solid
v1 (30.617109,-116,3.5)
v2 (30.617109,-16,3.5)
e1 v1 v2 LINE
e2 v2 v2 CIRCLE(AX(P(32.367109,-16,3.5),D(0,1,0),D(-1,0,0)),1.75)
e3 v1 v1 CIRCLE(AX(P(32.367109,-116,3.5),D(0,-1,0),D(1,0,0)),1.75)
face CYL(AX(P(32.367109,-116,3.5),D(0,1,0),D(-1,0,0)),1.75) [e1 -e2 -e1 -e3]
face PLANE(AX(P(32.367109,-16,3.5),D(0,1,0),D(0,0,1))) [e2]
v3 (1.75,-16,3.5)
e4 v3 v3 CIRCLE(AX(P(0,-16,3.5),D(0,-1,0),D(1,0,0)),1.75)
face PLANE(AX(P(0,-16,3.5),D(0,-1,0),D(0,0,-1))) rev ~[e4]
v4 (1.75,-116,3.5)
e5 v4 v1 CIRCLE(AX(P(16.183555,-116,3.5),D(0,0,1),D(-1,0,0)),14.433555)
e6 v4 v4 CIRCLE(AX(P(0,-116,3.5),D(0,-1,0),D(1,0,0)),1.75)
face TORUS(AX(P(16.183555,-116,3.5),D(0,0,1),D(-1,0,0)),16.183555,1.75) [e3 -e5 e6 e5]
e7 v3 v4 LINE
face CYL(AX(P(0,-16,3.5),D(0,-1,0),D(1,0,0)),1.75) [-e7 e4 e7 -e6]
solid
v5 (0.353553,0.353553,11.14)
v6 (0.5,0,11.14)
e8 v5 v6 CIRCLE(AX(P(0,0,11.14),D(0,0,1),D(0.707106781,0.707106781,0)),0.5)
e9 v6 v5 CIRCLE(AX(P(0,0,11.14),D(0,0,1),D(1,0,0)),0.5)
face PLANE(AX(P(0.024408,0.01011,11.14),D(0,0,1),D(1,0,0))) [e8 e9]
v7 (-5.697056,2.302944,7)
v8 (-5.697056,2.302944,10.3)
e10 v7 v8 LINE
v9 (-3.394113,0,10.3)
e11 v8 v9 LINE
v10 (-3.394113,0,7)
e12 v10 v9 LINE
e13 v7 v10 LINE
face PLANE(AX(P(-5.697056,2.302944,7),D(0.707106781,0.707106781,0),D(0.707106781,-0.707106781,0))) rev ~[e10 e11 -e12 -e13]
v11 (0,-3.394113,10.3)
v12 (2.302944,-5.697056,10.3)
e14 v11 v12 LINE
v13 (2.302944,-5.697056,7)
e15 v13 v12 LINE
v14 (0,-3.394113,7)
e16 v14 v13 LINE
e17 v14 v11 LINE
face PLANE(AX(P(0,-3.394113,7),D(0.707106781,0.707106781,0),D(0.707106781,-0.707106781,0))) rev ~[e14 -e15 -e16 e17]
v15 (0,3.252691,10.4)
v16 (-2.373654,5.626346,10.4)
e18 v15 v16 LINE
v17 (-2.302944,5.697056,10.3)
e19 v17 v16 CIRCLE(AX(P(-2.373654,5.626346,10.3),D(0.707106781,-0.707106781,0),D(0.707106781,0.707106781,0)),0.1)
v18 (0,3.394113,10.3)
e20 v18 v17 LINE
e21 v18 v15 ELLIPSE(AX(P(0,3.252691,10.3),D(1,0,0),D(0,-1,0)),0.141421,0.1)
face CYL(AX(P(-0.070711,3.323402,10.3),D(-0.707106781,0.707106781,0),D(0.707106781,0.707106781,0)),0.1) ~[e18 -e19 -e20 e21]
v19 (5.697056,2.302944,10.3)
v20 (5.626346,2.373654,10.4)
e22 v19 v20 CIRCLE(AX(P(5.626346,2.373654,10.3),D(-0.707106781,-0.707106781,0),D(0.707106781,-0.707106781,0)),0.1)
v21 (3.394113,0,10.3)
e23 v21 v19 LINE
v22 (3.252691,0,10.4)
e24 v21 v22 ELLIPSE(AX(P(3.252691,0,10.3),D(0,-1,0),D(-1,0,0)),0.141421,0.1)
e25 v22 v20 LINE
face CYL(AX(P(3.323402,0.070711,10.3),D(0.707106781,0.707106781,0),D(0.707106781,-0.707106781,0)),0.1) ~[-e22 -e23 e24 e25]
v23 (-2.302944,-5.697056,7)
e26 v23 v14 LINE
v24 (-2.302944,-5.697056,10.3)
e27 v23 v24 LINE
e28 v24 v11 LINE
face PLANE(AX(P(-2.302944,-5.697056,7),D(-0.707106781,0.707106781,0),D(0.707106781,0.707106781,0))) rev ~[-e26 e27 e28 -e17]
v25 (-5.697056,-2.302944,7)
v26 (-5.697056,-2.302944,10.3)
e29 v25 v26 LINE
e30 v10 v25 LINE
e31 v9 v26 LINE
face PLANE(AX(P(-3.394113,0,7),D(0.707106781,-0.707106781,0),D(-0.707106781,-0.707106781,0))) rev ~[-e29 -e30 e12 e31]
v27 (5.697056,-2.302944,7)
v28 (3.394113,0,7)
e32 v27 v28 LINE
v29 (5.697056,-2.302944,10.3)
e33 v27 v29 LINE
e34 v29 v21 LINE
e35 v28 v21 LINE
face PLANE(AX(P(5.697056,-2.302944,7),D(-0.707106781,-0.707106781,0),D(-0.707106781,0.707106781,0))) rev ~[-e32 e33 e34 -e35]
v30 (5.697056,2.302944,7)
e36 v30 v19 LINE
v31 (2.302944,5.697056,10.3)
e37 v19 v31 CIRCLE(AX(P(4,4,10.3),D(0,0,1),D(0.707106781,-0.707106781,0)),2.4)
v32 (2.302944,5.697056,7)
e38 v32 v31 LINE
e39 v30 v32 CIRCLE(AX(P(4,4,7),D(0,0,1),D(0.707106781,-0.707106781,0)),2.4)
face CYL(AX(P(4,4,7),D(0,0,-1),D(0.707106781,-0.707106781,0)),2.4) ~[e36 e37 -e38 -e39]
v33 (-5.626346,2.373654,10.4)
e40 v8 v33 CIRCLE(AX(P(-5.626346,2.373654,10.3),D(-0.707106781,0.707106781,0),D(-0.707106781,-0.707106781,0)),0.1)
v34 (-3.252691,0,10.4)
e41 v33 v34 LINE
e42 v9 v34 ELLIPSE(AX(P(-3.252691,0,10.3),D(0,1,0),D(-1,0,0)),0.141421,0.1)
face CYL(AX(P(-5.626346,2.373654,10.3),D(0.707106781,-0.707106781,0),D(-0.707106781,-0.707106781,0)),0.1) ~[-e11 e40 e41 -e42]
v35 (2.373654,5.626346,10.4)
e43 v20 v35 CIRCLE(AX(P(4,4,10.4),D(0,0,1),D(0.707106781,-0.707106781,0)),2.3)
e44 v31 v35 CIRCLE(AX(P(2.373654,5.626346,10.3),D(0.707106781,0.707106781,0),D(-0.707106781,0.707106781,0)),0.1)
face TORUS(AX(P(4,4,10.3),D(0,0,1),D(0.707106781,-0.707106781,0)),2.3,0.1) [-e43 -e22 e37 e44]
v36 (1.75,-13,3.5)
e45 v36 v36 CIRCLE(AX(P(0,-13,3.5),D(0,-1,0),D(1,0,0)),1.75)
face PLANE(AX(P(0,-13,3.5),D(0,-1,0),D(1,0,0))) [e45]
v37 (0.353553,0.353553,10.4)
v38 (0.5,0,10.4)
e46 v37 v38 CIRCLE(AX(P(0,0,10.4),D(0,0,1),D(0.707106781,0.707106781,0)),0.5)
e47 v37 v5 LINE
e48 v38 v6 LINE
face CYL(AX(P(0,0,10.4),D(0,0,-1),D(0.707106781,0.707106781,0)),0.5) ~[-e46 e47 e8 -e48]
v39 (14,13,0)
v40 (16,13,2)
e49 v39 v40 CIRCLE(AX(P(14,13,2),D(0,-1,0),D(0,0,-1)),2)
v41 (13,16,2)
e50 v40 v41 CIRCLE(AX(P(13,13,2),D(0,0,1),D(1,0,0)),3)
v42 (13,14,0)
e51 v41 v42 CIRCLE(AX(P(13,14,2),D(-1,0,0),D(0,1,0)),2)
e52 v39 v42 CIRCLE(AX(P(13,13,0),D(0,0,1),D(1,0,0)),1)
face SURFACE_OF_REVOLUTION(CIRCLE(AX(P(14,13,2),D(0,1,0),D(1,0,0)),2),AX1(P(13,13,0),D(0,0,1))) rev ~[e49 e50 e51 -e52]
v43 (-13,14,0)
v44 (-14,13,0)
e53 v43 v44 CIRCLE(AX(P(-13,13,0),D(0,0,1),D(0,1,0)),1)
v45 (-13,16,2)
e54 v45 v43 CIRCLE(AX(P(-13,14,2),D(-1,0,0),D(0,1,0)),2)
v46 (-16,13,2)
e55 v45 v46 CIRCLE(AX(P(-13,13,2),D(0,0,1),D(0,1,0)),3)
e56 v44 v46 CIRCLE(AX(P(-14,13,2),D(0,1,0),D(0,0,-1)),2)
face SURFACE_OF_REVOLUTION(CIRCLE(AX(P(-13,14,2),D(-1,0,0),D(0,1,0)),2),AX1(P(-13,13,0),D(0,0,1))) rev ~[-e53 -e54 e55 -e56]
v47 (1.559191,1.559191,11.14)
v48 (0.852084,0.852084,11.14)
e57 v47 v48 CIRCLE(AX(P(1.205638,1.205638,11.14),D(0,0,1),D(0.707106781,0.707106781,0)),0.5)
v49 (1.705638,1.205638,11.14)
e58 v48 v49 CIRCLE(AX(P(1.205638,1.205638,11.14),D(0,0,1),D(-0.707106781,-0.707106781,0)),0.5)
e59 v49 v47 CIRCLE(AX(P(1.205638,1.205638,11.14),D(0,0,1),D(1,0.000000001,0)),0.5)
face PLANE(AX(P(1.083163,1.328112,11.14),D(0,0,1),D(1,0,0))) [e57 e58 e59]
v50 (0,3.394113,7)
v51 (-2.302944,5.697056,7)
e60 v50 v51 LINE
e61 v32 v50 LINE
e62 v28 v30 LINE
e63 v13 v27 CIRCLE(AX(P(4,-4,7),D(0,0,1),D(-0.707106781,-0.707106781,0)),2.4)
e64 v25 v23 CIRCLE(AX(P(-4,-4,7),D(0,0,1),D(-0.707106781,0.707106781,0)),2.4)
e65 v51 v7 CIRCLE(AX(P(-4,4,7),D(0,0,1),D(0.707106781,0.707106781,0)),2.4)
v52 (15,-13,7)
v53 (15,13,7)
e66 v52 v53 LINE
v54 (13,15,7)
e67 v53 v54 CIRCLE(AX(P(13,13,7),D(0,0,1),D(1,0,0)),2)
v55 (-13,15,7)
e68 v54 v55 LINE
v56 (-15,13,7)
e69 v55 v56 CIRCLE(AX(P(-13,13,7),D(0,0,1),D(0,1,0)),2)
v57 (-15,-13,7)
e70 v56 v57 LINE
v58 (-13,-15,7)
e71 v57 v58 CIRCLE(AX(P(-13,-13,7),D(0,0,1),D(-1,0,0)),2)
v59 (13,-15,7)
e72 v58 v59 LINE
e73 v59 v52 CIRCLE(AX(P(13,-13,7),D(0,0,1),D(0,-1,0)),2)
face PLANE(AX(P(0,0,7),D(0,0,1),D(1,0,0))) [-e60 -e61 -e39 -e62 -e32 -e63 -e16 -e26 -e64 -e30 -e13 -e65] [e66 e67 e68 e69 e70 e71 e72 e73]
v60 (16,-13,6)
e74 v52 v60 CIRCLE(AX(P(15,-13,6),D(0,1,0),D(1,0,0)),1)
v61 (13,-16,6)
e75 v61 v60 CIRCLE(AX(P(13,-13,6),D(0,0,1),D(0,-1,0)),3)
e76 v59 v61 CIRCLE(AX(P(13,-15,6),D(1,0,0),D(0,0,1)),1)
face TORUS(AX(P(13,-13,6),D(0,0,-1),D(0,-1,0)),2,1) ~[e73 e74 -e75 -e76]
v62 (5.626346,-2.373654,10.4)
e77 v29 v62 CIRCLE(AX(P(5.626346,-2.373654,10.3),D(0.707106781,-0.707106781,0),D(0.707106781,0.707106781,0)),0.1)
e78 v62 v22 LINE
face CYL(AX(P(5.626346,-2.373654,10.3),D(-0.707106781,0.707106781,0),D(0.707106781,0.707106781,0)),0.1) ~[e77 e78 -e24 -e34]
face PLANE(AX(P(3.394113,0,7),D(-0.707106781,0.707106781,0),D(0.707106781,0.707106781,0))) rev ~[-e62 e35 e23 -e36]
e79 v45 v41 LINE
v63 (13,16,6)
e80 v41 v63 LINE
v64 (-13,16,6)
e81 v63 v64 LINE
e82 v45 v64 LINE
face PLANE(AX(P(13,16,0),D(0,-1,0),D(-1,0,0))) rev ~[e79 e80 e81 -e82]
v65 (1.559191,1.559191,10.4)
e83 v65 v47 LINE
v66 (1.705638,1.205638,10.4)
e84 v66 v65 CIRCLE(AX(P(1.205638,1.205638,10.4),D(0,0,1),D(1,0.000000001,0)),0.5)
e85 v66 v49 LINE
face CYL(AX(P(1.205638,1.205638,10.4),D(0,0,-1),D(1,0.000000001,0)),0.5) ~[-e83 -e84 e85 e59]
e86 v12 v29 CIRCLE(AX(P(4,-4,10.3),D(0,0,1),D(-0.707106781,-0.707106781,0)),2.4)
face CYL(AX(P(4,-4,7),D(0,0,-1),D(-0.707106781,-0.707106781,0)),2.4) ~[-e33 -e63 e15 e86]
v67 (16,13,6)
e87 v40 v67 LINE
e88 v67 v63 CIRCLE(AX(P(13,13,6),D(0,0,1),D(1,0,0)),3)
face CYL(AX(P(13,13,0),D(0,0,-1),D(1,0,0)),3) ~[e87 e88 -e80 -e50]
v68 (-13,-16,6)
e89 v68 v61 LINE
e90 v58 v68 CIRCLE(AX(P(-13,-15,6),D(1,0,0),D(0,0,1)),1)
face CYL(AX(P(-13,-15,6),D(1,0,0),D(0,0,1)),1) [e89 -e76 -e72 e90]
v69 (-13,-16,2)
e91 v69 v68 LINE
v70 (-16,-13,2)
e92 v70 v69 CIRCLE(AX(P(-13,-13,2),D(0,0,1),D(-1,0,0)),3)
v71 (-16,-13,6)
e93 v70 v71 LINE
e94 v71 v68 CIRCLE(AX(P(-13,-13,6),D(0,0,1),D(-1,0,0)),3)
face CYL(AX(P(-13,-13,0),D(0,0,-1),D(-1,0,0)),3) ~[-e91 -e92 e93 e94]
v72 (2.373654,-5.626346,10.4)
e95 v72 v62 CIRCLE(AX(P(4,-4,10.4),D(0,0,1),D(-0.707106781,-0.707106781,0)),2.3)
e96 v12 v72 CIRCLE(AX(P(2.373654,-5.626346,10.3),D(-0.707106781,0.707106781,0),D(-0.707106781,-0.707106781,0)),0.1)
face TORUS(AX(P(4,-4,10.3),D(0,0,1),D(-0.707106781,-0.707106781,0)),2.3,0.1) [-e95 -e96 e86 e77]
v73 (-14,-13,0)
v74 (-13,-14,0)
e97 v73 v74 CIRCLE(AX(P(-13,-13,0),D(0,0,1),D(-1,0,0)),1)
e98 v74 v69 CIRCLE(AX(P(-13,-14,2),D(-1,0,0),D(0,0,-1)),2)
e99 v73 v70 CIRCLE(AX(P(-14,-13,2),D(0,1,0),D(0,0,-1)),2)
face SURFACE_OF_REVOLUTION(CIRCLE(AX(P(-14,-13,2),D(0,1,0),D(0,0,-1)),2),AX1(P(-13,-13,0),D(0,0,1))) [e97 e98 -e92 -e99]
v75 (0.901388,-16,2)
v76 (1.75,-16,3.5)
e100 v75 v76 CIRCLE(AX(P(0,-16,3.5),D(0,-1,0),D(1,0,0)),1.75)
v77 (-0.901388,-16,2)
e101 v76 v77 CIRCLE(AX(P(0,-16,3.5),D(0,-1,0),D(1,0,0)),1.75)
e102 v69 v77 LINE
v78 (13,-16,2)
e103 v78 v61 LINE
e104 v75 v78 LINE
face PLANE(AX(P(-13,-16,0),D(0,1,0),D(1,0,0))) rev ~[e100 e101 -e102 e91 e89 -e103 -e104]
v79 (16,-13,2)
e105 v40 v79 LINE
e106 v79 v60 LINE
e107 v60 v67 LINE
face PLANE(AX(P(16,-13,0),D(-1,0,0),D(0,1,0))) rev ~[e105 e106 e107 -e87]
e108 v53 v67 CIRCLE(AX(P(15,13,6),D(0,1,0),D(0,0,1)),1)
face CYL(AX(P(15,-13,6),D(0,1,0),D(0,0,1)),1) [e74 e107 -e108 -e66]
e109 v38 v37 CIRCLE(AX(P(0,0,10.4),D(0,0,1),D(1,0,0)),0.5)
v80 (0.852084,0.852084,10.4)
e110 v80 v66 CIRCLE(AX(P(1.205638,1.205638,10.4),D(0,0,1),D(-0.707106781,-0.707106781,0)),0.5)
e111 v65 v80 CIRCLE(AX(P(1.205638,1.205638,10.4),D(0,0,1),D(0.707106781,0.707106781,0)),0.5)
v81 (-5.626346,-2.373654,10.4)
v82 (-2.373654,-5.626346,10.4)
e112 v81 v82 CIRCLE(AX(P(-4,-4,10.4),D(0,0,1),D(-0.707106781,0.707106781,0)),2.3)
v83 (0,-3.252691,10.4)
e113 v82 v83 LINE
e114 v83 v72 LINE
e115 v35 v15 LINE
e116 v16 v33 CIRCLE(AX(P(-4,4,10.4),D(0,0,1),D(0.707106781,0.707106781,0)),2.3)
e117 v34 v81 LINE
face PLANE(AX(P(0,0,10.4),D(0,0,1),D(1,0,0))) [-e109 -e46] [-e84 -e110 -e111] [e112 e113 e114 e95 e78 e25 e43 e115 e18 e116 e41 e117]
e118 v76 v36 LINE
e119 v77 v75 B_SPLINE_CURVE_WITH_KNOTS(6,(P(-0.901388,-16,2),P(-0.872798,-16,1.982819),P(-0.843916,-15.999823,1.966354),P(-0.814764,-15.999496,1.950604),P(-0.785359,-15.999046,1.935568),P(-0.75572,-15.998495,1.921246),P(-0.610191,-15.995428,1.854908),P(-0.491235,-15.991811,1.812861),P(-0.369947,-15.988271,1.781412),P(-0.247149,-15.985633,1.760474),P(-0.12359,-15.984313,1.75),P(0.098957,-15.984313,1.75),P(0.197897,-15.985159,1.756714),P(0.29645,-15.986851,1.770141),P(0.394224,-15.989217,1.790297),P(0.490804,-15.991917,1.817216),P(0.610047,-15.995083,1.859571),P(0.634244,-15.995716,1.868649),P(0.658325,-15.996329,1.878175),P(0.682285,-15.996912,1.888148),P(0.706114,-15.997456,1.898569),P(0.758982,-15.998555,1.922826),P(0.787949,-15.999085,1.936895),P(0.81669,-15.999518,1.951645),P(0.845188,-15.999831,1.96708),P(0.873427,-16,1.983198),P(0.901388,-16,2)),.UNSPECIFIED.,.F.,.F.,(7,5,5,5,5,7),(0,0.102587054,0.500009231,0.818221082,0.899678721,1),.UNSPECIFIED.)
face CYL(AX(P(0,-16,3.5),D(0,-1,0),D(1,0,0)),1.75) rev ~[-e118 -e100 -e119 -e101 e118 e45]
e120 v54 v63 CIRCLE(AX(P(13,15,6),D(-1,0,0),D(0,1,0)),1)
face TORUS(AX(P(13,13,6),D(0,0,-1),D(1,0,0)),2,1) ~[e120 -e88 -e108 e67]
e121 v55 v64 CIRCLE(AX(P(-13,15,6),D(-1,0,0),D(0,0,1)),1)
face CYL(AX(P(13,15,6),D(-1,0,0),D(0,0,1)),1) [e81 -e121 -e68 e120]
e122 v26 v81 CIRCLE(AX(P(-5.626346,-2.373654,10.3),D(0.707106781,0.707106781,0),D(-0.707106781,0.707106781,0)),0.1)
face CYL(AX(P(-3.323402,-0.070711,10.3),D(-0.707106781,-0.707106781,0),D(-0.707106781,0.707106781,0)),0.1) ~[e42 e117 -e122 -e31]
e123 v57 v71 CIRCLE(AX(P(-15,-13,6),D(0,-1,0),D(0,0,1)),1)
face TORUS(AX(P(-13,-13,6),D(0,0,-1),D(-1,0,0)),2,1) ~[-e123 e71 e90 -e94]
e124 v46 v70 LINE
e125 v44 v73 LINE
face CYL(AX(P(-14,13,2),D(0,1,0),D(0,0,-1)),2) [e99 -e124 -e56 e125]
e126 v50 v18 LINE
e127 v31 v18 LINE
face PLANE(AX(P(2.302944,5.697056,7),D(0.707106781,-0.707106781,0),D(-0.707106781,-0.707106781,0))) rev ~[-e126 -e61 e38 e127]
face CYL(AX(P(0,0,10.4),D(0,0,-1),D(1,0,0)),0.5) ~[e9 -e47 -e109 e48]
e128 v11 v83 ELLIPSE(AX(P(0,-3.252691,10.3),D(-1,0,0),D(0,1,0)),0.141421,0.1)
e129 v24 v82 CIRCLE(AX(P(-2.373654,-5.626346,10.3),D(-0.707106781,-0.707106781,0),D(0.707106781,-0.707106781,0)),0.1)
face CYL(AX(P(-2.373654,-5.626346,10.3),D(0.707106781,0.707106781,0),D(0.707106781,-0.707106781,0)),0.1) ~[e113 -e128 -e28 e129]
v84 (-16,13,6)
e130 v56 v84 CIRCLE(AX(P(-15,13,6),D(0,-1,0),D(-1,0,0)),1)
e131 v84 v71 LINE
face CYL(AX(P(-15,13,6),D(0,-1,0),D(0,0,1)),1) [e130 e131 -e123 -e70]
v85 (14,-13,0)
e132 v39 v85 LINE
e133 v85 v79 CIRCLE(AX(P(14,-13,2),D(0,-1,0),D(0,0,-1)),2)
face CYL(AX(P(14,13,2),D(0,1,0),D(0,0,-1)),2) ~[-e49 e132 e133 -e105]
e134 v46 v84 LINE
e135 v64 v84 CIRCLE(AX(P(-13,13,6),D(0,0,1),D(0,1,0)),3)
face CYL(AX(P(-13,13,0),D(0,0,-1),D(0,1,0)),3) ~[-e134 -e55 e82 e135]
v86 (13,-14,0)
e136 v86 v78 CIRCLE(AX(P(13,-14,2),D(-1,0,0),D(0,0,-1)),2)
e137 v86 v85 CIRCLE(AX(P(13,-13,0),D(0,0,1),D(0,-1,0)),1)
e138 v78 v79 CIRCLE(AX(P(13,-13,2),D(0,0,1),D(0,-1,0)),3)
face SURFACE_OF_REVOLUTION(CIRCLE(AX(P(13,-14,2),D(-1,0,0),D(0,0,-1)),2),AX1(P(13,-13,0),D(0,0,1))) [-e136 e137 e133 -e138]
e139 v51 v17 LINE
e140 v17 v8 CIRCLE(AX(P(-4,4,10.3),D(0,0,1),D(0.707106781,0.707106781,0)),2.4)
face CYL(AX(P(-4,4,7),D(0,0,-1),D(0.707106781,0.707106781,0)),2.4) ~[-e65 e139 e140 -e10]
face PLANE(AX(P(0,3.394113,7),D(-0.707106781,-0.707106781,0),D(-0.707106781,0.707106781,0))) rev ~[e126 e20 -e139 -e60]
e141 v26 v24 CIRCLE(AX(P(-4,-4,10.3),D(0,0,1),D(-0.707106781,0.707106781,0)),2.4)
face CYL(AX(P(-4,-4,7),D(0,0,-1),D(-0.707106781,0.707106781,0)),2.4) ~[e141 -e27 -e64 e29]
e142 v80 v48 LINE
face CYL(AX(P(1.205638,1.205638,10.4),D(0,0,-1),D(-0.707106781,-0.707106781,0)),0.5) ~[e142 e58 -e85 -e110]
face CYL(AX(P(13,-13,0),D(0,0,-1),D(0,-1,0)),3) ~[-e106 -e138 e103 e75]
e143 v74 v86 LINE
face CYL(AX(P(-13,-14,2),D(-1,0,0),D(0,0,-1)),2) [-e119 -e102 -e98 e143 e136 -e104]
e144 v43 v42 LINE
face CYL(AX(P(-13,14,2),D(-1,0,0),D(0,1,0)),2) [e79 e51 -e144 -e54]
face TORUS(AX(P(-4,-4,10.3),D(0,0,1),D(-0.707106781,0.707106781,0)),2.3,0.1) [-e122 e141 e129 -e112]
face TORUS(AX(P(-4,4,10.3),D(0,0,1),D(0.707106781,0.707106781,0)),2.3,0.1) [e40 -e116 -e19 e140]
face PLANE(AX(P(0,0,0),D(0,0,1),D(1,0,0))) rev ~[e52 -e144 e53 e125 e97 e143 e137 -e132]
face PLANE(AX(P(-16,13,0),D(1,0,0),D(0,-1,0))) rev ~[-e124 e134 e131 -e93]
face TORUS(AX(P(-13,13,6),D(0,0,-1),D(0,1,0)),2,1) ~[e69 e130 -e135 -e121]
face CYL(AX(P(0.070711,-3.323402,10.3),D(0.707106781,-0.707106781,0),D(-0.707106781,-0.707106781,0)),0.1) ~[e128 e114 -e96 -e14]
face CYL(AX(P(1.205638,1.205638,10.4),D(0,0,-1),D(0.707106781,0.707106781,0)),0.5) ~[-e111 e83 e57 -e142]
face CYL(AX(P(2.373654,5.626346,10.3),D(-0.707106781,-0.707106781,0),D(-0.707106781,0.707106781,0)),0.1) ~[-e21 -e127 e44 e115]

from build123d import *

# Parameters (mm, degrees)
F1_DEPTH     = 7
F3_DEPTH     = 3.4
F5_DEPTH     = 0.74
F6_R         = 1.75
F7_DEPTH     = 3
F8_T1_DEPTH  = 26
F8_T3_DEPTH  = 26
F8_T6_ANGLE  = 90
F8_T8_ANGLE  = 90
F8_T10_ANGLE = 90
F8_T12_ANGLE = 90
F9_R         = 1
F10_R        = 0.1


# Not quite as in the source:
# - a fillet or chamfer that OpenCascade refuses, or shapes differently, is made with other operations: its cross-section is extruded or revolved along the edge and cut away or added


with BuildPart() as f1:
    # F0 (on Top) → F1 (new body)
    with BuildSketch(Plane.XY):
        with BuildLine():
            Line((13, 16), (-13, 16))
            ThreePointArc((-13, 16), (-15.1213203436, 15.1213203436), (-16, 13))
            Line((-16, 13), (-16, -13))
            ThreePointArc((-16, -13), (-15.1213203436, -15.1213203436), (-13, -16))
            Line((-13, -16), (13, -16))
            ThreePointArc((13, -16), (15.1213203436, -15.1213203436), (16, -13))
            Line((16, -13), (16, 13))
            ThreePointArc((16, 13), (15.1213203436, 15.1213203436), (13, 16))
        make_face()
    extrude(amount=F1_DEPTH)

    # F2 (on face) → F3 (join)
    with BuildSketch(Plane.XY.offset(7)):
        with BuildLine():
            Line((0, 3.3941125497), (-2.3029437252, 5.6970562748))
            ThreePointArc((-2.3029437252, 5.6970562748), (-5.6970562748, 5.6970562748), (-5.6970562748, 2.3029437252))
            Line((-5.6970562748, 2.3029437252), (-3.3941125497, 0))
            Line((-3.3941125497, 0), (-5.6970562748, -2.3029437252))
            ThreePointArc((-5.6970562748, -2.3029437252), (-5.6970562748, -5.6970562748), (-2.3029437252, -5.6970562748))
            Line((-2.3029437252, -5.6970562748), (0, -3.3941125497))
            Line((0, -3.3941125497), (2.3029437252, -5.6970562748))
            ThreePointArc((2.3029437252, -5.6970562748), (5.6970562748, -5.6970562748), (5.6970562748, -2.3029437252))
            Line((5.6970562748, -2.3029437252), (3.3941125497, 0))
            Line((3.3941125497, 0), (5.6970562748, 2.3029437252))
            ThreePointArc((5.6970562748, 2.3029437252), (5.6970562748, 5.6970562748), (2.3029437252, 5.6970562748))
            Line((2.3029437252, 5.6970562748), (0, 3.3941125497))
        make_face()
    extrude(amount=F3_DEPTH)

    # F4 (on face) → F5 (join)
    with BuildSketch(Plane.XY.offset(10.4)):
        with BuildLine():
            ThreePointArc((0.3535533906, 0.3535533906), (-0.4619397663, -0.1913417162), (0.5, 0))
            ThreePointArc((0.5, 0), (0.4619397663, 0.1913417162), (0.3535533906, 0.3535533906))
        make_face()
        with BuildLine():
            ThreePointArc((1.5591911551, 1.5591911551), (0.8520843739, 1.5591911551), (0.8520843739, 0.8520843739))
            Line((0.8520843739, 0.8520843739), (1.5591911551, 1.5591911551))
        make_face()
        with BuildLine():
            Line((1.5591911551, 1.5591911551), (0.8520843739, 0.8520843739))
            ThreePointArc((0.8520843739, 0.8520843739), (1.3969794806, 0.7436979982), (1.7056377645, 1.2056377645))
            ThreePointArc((1.7056377645, 1.2056377645), (1.6675775307, 1.3969794806), (1.5591911551, 1.5591911551))
        make_face()
    extrude(amount=F5_DEPTH)

    # F6 (on face) → F7 (cut)
    with BuildSketch(Plane.XZ.offset(16)):
        with Locations((0, 3.5)):
            Circle(F6_R)
    extrude(amount=-F7_DEPTH, mode=Mode.SUBTRACT)

    # F8: fillet of radius 2 on 8 edges, made by hand

    # F8_s2 → F8_t1 (cut)
    with BuildSketch(Plane.YZ.offset(-13)):
        with BuildLine():
            ThreePointArc((-14, 0), (-15.4142135624, 0.5857864376), (-16, 2))
            Line((-16, 2), (-16, 0))
            Line((-16, 0), (-14, 0))
        make_face()
        with BuildLine():
            ThreePointArc((16, 2), (15.4142135624, 0.5857864376), (14, 0))
            Line((14, 0), (16, 0))
            Line((16, 0), (16, 2))
        make_face()
    extrude(amount=F8_T1_DEPTH, mode=Mode.SUBTRACT)

    # F8_s4 → F8_t3 (cut)
    with BuildSketch(Plane.XZ.offset(-13)):
        with BuildLine():
            ThreePointArc((-14, 0), (-15.4142135624, 0.5857864376), (-16, 2))
            Line((-16, 2), (-16, 0))
            Line((-16, 0), (-14, 0))
        make_face()
        with BuildLine():
            ThreePointArc((14, 0), (15.4142135624, 0.5857864376), (16, 2))
            Line((16, 2), (16, 0))
            Line((16, 0), (14, 0))
        make_face()
    extrude(amount=F8_T3_DEPTH, mode=Mode.SUBTRACT)

    # F8_s5 → F8_t6 (revolve, cut)
    with BuildSketch(Plane.XZ.offset(-13)):
        with BuildLine():
            ThreePointArc((16, 2), (15.4142135624, 0.5857864376), (14, 0))
            Line((14, 0), (16, 0))
            Line((16, 0), (16, 2))
        make_face()
    revolve(axis=Axis((13, 13, 0), (0, 0, 1)), revolution_arc=F8_T6_ANGLE, mode=Mode.SUBTRACT)

    # F8_s7 → F8_t8 (revolve, cut)
    with BuildSketch(Plane.YZ.offset(-13)):
        with BuildLine():
            ThreePointArc((16, 2), (15.4142135624, 0.5857864376), (14, 0))
            Line((14, 0), (16, 0))
            Line((16, 0), (16, 2))
        make_face()
    revolve(axis=Axis((-13, 13, 0), (0, 0, 1)), revolution_arc=F8_T8_ANGLE, mode=Mode.SUBTRACT)

    # F8_s9 → F8_t10 (revolve, cut)
    with BuildSketch(Plane.XZ.offset(13)):
        with BuildLine():
            ThreePointArc((-14, 0), (-15.4142135624, 0.5857864376), (-16, 2))
            Line((-16, 2), (-16, 0))
            Line((-16, 0), (-14, 0))
        make_face()
    revolve(axis=Axis((-13, -13, 0), (0, 0, 1)), revolution_arc=F8_T10_ANGLE, mode=Mode.SUBTRACT)

    # F8_s11 → F8_t12 (revolve, cut)
    with BuildSketch(Plane.YZ.offset(13)):
        with BuildLine():
            ThreePointArc((-14, 0), (-15.4142135624, 0.5857864376), (-16, 2))
            Line((-16, 2), (-16, 0))
            Line((-16, 0), (-14, 0))
        make_face()
    revolve(axis=Axis((13, -13, 0), (0, 0, 1)), revolution_arc=F8_T12_ANGLE, mode=Mode.SUBTRACT)

    # F9
    f9_edges = [f1.edges().sort_by_distance(p)[0] for p in [
        (0, -16, 7),
        (-15.12132, 15.12132, 7),
        (-16, 0, 7),
        (0, 16, 7),
        (15.12132, 15.12132, 7),
        (16, 0, 7),
        (15.12132, -15.12132, 7),
        (-15.12132, -15.12132, 7),
    ]]
    fillet(f9_edges, radius=F9_R)

    # F10
    f10_edges = [f1.edges().sort_by_distance(p)[0] for p in [
        (-1.151472, -4.545584, 10.4),
        (1.151472, -4.545584, 10.4),
        (4.545584, 1.151472, 10.4),
        (-1.151472, 4.545584, 10.4),
        (5.697056, 5.697056, 10.4),
        (1.151472, 4.545584, 10.4),
        (-5.697056, 5.697056, 10.4),
        (-4.545584, 1.151472, 10.4),
        (-4.545584, -1.151472, 10.4),
        (-5.697056, -5.697056, 10.4),
        (5.697056, -5.697056, 10.4),
        (4.545584, -1.151472, 10.4),
    ]]
    fillet(f10_edges, radius=F10_R)


with BuildPart() as f12:
    # F12: sweep along a path in F11
    with BuildLine(Plane.XY) as f12_path:
        Line((-1.316445414, -16), (-1.316445414, -116))
        ThreePointArc((-1.316445414, -116), (16.183554586, -133.5), (33.683554586, -116))
        Line((33.683554586, -116), (33.683554586, -16))
    # F6 (on face) → F12 (sweep)
    with BuildSketch(Plane.XZ.offset(16)):
        with Locations((0, 3.5)):
            Circle(F6_R)
    sweep(path=f12_path.line)


solid = Compound([f1.part, f12.part])
